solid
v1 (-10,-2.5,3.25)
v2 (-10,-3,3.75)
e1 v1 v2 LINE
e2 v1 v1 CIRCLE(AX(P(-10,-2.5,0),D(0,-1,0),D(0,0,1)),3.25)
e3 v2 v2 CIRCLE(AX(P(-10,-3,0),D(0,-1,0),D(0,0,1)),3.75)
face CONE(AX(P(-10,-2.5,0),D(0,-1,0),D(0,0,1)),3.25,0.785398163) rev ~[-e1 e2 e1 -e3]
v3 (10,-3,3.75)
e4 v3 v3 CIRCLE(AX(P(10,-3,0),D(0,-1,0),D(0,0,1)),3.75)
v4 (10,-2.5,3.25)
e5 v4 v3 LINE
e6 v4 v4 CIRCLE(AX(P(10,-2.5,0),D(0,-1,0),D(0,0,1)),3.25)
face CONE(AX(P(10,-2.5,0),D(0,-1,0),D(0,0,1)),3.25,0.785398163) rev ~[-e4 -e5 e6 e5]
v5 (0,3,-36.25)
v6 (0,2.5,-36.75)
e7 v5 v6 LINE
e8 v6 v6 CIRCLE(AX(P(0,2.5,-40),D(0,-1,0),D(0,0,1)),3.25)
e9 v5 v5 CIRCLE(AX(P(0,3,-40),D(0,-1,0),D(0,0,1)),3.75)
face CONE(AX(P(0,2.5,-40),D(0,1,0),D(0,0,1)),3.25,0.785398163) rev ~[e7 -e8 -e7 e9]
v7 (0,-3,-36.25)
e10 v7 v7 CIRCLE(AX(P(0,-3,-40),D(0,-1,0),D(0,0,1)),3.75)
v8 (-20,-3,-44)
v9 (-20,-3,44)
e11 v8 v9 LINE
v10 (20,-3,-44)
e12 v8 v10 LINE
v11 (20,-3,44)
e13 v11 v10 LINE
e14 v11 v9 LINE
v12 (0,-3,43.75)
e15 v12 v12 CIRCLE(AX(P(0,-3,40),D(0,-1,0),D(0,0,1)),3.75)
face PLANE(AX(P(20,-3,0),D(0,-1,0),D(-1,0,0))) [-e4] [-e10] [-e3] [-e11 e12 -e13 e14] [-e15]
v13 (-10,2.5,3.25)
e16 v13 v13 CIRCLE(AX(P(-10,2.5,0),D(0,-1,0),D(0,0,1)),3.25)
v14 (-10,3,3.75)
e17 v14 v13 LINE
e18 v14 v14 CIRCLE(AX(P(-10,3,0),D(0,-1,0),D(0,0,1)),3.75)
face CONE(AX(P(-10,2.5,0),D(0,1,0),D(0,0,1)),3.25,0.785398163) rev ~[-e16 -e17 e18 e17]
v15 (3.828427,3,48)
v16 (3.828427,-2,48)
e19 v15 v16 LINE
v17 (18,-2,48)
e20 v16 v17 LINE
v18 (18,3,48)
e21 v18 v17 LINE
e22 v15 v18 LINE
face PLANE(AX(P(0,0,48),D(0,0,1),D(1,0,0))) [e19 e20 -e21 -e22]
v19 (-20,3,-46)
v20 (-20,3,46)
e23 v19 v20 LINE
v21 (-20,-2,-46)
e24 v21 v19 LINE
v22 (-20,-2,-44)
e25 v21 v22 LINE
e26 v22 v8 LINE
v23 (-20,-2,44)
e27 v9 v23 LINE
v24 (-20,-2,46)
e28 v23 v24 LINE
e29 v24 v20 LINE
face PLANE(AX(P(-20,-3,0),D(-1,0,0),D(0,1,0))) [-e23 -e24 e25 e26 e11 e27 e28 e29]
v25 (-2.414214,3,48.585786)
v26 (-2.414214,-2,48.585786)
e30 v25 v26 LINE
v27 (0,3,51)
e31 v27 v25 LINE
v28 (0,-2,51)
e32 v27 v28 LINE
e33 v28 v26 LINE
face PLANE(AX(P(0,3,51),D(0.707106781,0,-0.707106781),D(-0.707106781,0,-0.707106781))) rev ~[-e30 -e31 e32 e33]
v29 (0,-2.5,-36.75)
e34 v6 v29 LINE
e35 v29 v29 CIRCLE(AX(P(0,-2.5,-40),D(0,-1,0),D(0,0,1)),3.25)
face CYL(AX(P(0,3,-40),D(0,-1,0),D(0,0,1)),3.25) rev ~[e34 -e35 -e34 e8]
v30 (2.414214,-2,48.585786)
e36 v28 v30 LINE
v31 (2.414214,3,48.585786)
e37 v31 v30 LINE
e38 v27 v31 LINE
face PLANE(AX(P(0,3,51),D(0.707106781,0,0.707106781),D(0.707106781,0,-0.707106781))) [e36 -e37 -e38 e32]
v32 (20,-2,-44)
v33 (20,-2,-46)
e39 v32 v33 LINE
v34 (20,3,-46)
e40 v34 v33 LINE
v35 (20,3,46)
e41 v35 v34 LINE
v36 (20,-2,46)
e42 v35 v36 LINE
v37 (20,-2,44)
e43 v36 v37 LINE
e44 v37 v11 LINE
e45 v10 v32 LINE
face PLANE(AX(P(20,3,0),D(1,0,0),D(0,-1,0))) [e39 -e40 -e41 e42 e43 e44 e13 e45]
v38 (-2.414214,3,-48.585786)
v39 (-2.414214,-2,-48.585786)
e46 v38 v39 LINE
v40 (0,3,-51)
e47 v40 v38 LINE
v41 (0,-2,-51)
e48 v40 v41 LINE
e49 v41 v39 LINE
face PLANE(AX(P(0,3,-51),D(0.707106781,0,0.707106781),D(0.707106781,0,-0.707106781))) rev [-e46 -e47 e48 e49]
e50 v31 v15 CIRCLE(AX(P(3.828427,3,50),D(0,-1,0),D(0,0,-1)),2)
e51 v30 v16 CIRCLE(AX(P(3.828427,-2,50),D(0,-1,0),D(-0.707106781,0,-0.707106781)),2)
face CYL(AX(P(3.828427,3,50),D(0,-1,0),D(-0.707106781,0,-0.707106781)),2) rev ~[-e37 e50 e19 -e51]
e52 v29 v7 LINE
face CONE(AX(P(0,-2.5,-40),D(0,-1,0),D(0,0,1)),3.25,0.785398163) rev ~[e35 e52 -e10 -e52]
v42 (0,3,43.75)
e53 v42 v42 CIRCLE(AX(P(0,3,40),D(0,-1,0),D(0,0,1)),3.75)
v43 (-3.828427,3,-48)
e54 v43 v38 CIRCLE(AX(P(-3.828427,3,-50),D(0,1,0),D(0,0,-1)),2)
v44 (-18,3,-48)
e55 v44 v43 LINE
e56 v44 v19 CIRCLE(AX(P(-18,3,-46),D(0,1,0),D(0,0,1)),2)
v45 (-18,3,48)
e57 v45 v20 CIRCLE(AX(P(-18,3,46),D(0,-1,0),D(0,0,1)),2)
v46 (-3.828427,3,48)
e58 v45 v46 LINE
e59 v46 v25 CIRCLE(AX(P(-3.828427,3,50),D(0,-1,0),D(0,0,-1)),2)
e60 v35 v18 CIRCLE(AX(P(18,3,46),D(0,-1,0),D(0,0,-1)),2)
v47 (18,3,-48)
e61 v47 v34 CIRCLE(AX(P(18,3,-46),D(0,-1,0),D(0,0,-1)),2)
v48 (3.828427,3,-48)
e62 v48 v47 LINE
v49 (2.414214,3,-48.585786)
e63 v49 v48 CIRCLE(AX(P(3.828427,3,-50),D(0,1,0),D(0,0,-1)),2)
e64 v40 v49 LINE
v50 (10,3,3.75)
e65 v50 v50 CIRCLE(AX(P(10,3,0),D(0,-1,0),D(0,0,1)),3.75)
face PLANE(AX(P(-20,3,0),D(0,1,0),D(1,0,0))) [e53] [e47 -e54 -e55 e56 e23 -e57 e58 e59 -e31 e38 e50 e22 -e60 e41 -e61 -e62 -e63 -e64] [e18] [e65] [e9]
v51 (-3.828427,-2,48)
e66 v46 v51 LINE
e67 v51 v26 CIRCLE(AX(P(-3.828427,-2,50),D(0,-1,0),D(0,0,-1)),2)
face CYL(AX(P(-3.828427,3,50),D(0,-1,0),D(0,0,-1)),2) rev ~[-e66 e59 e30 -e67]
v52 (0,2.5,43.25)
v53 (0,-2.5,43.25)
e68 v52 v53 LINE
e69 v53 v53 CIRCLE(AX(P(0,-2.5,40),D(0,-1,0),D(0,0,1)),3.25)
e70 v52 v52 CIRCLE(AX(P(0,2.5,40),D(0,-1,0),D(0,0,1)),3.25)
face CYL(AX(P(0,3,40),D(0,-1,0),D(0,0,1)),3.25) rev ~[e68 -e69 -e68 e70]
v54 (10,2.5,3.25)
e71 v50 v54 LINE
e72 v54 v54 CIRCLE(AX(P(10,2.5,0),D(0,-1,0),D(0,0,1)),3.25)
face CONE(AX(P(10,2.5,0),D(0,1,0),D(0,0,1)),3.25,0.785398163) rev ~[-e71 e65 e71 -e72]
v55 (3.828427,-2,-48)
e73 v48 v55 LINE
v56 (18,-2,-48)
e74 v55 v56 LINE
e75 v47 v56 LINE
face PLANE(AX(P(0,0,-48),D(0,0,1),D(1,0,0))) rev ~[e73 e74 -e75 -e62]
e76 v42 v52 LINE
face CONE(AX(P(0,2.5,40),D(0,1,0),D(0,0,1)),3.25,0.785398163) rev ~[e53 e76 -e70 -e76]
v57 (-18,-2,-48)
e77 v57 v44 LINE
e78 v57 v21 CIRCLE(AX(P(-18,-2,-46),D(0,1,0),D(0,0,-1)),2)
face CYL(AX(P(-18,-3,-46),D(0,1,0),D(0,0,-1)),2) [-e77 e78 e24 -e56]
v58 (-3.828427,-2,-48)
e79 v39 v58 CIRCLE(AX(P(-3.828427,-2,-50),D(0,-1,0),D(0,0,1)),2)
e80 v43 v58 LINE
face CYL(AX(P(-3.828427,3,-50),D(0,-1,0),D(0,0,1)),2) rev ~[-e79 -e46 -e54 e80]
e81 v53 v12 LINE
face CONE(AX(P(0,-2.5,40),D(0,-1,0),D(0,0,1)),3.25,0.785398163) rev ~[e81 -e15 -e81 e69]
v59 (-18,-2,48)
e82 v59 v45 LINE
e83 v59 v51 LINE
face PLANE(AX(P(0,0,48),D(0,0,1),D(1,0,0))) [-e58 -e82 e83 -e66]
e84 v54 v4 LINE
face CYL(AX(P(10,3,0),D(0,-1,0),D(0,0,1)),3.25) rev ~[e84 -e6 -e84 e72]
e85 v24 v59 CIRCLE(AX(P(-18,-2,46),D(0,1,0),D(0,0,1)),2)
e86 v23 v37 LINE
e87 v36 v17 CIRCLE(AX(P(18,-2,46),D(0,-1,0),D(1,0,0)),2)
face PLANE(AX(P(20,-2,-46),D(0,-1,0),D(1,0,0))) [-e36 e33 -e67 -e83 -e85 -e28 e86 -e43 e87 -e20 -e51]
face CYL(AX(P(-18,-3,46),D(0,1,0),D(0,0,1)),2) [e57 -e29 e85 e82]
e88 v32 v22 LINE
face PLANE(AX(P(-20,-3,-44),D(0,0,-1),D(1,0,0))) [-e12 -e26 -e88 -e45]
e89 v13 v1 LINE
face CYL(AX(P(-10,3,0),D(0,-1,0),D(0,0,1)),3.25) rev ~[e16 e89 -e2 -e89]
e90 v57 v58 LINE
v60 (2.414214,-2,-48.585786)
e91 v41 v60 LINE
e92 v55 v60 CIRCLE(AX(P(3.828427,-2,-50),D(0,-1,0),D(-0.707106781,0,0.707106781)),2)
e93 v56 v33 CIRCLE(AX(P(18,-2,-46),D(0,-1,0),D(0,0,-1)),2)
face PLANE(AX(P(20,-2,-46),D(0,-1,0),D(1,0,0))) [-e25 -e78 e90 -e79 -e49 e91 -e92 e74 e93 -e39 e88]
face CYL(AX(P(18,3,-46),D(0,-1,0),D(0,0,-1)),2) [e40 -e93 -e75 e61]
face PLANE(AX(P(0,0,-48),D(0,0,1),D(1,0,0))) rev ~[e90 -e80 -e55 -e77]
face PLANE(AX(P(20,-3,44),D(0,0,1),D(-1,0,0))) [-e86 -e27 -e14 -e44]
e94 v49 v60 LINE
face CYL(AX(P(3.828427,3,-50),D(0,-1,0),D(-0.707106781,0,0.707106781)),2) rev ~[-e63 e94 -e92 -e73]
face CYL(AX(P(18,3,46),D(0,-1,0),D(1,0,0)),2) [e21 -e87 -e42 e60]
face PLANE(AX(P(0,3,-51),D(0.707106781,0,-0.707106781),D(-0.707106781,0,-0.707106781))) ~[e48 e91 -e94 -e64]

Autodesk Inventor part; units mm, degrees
ref_plane "XZ Plane" through (0, 0, 0) normal (0, 1, 0) x (-1, 0, 0)
sketch "Skizze1" plane through (0, 0, 0) normal (0, 0, 1) x (1, 0, 0)
  line L0 (-20, 3) -> (20, 3)
  line L1 (20, 3) -> (20, -3)
  line L2 (20, -3) -> (-20, -3)
  line L3 (-20, -3) -> (-20, 3)
  line L4 (-20, 3) -> (20, -3) construction
  line L5 (20, 3) -> (-20, -3) construction
  point P0 (0, 0)
  dimension "d0" = 6
  dimension "d2" = 40
extrude "Extrusion1" add sketch "Skizze1" along normal mid plane 96
sketch "Skizze3" plane through (-20, 3, 48) normal (0, 1, 0) x (1, 0, 0)
  line L0 (0, 96) -> (0, 0) projected
  line L1 (40, 0) -> (0, 0) projected
  line L2 (40, 96) -> (40, 0) projected
  line L3 (0, 96) -> (40, 96) projected
  point P0 (20, 48)
  point P1 (10, 48)
  point P2 (30, 48)
  point P3 (0, 48)
  dimension "d5" = 10
  dimension "d6" = 10
hole "Bohrung1" at (-10, 3, 0) at (10, 3, 0) direction (0, -1, 0) diameter 6.5 end through all
sketch "Skizze4" plane through (-20, 3, 48) normal (0, 1, 0) x (1, 0, 0)
  circle A0 centre (30, 48) radius 3.25 projected
  circle A1 centre (10, 48) radius 3.25 projected
  line L0 (0, 96) -> (0, 0) projected
  line L1 (40, 0) -> (0, 0) projected
  line L2 (40, 96) -> (40, 0) projected
  line L3 (0, 96) -> (40, 96) projected
  point P0 (20, 48)
  point P1 (20, 8)
  point P2 (20, 88)
  dimension "d14" = 40
  dimension "d15" = 40
hole "Bohrung2" at (0, 3, 40) at (0, 3, -40) direction (0, -1, 0) diameter 6.5 end through all
sketch "Skizze5" plane through (-20, 3, 48) normal (0, 1, 0) x (1, 0, 0)
  circle A0 centre (20, 88) radius 3.25 projected
  circle A1 centre (20, 8) radius 3.25 projected
  circle A2 centre (30, 48) radius 3.25 projected
  circle A3 centre (10, 48) radius 3.25 projected
  line L0 (0, 96) -> (0, 0) projected
  line L1 (40, 0) -> (0, 0) projected
  line L2 (40, 96) -> (40, 0) projected
  line L3 (0, 96) -> (40, 96) projected
  line L4 (20, 115.8) -> (20, -22.8) projected
  line L5 (40, 0) -> (0, 0) projected
  line L6 (20, -3) -> (23, 0)
  line L7 (20, -3) -> (17, 0)
  line L8 (0, 0) -> (40, 0) projected
  point P0 (20, 48)
  dimension "d29" = 6
  dimension "d30" = 3
  dimension "d31" = 45
extrude "Extrusion2" add sketch "Skizze5" against normal up to surface (6 mm away) contours L4 L7 L1 | L1 L6 L4
mirror "Spiegeln1" about plane through (0, 0, 0) normal (1, 0, 0) of "Extrusion2"
mirror "Spiegeln2" about plane through (0, 0, 0) normal (0, 0, 1) of "Extrusion2", "Spiegeln1"
fillet "Rundung1" radius 2 4 edges at (-20, 0, 48) (20, 0, 48) (-20, 0, -48) (20, 0, -48)
fillet "Rundung2" radius 2 4 edges at (-3, 0, 48) (3, 0, 48) (-3, 0, -48) (3, 0, -48)
sketch "Skizze6" plane through (20, -3, -46) normal (0, -1, 0) x (1, 0, 0)
  circle A0 centre (-20, 6) radius 3.25 projected
  circle A1 centre (-20, 86) radius 3.25 projected
  circle A2 centre (-10, 46) radius 3.25 projected
  circle A3 centre (-30, 46) radius 3.25 projected
  arc A4 (-2, -2) -> (0, 0) centre (-2, 0) ccw projected
  line L0 (0, 0) -> (0, 92) projected
  arc A5 (0, 92) -> (-2, 94) centre (-2, 92) ccw projected
  line L1 (-16.1716, 94) -> (-2, 94) projected
  arc A6 (-17.5858, 94.5858) -> (-16.1716, 94) centre (-16.1716, 96) ccw projected
  line L2 (-20, 97) -> (-17.5858, 94.5858) projected
  line L3 (-22.4142, 94.5858) -> (-20, 97) projected
  arc A7 (-23.8284, 94) -> (-22.4142, 94.5858) centre (-23.8284, 96) ccw projected
  line L4 (-38, 94) -> (-23.8284, 94) projected
  arc A8 (-38, 94) -> (-40, 92) centre (-38, 92) ccw projected
  line L5 (-40, 92) -> (-40, 0) projected
  arc A9 (-40, 0) -> (-38, -2) centre (-38, 0) ccw projected
  line L6 (-23.8284, -2) -> (-38, -2) projected
  arc A10 (-22.4142, -2.5858) -> (-23.8284, -2) centre (-23.8284, -4) ccw projected
  line L7 (-22.4142, -2.5858) -> (-20, -5) projected
  line L8 (-20, -5) -> (-17.5858, -2.5858) projected
  arc A11 (-16.1716, -2) -> (-17.5858, -2.5858) centre (-16.1716, -4) ccw projected
  line L9 (-2, -2) -> (-16.1716, -2) projected
  line L10 (-59.3165, 111.9132) -> (18.0456, 111.9132)
  line L11 (18.0456, 111.9132) -> (18.0456, 90)
  line L12 (18.0456, 90) -> (-59.3165, 90)
  line L13 (-59.3165, 90) -> (-59.3165, 111.9132)
  line L14 (-80.9876, 2) -> (21.6776, 2)
  line L15 (21.6776, 2) -> (21.6776, -24.7559)
  line L16 (21.6776, -24.7559) -> (-80.9876, -24.7559)
  line L17 (-80.9876, -24.7559) -> (-80.9876, 2)
  point P0 (-20, 46)
  point P1 (-40, 2)
  point P2 (0, 2)
  dimension "d34" = 4
  dimension "d35" = 4
  dimension "d36" = 77.3621
  dimension "d37" = 21.9132
  dimension "d38" = 102.6652
  dimension "d39" = 26.7559
extrude "Extrusion3" cut sketch "Skizze6" against normal blind 1 contours L9 A11 L8 L7 A10 L6 A9 L5 L14 L0 A4 | A4 L0 L14 L15 L16 L17 L5 A9 L6 A10 L7 L8 A11 L9 | L12 L5 A8 L4 A7 L3 L2 A6 L1 A5 L0 | L0 A5 L1 A6 L2 L3 A7 L4 A8 L5 L12 L13 L10 L11
chamfer "Fasen1" distance 0.5 angle 45 4 edges at (-10, -3, -3.25) (-10, 3, -3.25) (10, -3, -3.25) (10, 3, -3.25)
chamfer "Fasen2" distance 0.5 angle 45 2 edges at (0, -3, 36.75) (0, 3, 36.75)
chamfer "Fasen3" distance 0.5 angle 45 2 edges at (0, -3, -43.25) (0, 3, -43.25)
properties part number "Klemmplatte"
